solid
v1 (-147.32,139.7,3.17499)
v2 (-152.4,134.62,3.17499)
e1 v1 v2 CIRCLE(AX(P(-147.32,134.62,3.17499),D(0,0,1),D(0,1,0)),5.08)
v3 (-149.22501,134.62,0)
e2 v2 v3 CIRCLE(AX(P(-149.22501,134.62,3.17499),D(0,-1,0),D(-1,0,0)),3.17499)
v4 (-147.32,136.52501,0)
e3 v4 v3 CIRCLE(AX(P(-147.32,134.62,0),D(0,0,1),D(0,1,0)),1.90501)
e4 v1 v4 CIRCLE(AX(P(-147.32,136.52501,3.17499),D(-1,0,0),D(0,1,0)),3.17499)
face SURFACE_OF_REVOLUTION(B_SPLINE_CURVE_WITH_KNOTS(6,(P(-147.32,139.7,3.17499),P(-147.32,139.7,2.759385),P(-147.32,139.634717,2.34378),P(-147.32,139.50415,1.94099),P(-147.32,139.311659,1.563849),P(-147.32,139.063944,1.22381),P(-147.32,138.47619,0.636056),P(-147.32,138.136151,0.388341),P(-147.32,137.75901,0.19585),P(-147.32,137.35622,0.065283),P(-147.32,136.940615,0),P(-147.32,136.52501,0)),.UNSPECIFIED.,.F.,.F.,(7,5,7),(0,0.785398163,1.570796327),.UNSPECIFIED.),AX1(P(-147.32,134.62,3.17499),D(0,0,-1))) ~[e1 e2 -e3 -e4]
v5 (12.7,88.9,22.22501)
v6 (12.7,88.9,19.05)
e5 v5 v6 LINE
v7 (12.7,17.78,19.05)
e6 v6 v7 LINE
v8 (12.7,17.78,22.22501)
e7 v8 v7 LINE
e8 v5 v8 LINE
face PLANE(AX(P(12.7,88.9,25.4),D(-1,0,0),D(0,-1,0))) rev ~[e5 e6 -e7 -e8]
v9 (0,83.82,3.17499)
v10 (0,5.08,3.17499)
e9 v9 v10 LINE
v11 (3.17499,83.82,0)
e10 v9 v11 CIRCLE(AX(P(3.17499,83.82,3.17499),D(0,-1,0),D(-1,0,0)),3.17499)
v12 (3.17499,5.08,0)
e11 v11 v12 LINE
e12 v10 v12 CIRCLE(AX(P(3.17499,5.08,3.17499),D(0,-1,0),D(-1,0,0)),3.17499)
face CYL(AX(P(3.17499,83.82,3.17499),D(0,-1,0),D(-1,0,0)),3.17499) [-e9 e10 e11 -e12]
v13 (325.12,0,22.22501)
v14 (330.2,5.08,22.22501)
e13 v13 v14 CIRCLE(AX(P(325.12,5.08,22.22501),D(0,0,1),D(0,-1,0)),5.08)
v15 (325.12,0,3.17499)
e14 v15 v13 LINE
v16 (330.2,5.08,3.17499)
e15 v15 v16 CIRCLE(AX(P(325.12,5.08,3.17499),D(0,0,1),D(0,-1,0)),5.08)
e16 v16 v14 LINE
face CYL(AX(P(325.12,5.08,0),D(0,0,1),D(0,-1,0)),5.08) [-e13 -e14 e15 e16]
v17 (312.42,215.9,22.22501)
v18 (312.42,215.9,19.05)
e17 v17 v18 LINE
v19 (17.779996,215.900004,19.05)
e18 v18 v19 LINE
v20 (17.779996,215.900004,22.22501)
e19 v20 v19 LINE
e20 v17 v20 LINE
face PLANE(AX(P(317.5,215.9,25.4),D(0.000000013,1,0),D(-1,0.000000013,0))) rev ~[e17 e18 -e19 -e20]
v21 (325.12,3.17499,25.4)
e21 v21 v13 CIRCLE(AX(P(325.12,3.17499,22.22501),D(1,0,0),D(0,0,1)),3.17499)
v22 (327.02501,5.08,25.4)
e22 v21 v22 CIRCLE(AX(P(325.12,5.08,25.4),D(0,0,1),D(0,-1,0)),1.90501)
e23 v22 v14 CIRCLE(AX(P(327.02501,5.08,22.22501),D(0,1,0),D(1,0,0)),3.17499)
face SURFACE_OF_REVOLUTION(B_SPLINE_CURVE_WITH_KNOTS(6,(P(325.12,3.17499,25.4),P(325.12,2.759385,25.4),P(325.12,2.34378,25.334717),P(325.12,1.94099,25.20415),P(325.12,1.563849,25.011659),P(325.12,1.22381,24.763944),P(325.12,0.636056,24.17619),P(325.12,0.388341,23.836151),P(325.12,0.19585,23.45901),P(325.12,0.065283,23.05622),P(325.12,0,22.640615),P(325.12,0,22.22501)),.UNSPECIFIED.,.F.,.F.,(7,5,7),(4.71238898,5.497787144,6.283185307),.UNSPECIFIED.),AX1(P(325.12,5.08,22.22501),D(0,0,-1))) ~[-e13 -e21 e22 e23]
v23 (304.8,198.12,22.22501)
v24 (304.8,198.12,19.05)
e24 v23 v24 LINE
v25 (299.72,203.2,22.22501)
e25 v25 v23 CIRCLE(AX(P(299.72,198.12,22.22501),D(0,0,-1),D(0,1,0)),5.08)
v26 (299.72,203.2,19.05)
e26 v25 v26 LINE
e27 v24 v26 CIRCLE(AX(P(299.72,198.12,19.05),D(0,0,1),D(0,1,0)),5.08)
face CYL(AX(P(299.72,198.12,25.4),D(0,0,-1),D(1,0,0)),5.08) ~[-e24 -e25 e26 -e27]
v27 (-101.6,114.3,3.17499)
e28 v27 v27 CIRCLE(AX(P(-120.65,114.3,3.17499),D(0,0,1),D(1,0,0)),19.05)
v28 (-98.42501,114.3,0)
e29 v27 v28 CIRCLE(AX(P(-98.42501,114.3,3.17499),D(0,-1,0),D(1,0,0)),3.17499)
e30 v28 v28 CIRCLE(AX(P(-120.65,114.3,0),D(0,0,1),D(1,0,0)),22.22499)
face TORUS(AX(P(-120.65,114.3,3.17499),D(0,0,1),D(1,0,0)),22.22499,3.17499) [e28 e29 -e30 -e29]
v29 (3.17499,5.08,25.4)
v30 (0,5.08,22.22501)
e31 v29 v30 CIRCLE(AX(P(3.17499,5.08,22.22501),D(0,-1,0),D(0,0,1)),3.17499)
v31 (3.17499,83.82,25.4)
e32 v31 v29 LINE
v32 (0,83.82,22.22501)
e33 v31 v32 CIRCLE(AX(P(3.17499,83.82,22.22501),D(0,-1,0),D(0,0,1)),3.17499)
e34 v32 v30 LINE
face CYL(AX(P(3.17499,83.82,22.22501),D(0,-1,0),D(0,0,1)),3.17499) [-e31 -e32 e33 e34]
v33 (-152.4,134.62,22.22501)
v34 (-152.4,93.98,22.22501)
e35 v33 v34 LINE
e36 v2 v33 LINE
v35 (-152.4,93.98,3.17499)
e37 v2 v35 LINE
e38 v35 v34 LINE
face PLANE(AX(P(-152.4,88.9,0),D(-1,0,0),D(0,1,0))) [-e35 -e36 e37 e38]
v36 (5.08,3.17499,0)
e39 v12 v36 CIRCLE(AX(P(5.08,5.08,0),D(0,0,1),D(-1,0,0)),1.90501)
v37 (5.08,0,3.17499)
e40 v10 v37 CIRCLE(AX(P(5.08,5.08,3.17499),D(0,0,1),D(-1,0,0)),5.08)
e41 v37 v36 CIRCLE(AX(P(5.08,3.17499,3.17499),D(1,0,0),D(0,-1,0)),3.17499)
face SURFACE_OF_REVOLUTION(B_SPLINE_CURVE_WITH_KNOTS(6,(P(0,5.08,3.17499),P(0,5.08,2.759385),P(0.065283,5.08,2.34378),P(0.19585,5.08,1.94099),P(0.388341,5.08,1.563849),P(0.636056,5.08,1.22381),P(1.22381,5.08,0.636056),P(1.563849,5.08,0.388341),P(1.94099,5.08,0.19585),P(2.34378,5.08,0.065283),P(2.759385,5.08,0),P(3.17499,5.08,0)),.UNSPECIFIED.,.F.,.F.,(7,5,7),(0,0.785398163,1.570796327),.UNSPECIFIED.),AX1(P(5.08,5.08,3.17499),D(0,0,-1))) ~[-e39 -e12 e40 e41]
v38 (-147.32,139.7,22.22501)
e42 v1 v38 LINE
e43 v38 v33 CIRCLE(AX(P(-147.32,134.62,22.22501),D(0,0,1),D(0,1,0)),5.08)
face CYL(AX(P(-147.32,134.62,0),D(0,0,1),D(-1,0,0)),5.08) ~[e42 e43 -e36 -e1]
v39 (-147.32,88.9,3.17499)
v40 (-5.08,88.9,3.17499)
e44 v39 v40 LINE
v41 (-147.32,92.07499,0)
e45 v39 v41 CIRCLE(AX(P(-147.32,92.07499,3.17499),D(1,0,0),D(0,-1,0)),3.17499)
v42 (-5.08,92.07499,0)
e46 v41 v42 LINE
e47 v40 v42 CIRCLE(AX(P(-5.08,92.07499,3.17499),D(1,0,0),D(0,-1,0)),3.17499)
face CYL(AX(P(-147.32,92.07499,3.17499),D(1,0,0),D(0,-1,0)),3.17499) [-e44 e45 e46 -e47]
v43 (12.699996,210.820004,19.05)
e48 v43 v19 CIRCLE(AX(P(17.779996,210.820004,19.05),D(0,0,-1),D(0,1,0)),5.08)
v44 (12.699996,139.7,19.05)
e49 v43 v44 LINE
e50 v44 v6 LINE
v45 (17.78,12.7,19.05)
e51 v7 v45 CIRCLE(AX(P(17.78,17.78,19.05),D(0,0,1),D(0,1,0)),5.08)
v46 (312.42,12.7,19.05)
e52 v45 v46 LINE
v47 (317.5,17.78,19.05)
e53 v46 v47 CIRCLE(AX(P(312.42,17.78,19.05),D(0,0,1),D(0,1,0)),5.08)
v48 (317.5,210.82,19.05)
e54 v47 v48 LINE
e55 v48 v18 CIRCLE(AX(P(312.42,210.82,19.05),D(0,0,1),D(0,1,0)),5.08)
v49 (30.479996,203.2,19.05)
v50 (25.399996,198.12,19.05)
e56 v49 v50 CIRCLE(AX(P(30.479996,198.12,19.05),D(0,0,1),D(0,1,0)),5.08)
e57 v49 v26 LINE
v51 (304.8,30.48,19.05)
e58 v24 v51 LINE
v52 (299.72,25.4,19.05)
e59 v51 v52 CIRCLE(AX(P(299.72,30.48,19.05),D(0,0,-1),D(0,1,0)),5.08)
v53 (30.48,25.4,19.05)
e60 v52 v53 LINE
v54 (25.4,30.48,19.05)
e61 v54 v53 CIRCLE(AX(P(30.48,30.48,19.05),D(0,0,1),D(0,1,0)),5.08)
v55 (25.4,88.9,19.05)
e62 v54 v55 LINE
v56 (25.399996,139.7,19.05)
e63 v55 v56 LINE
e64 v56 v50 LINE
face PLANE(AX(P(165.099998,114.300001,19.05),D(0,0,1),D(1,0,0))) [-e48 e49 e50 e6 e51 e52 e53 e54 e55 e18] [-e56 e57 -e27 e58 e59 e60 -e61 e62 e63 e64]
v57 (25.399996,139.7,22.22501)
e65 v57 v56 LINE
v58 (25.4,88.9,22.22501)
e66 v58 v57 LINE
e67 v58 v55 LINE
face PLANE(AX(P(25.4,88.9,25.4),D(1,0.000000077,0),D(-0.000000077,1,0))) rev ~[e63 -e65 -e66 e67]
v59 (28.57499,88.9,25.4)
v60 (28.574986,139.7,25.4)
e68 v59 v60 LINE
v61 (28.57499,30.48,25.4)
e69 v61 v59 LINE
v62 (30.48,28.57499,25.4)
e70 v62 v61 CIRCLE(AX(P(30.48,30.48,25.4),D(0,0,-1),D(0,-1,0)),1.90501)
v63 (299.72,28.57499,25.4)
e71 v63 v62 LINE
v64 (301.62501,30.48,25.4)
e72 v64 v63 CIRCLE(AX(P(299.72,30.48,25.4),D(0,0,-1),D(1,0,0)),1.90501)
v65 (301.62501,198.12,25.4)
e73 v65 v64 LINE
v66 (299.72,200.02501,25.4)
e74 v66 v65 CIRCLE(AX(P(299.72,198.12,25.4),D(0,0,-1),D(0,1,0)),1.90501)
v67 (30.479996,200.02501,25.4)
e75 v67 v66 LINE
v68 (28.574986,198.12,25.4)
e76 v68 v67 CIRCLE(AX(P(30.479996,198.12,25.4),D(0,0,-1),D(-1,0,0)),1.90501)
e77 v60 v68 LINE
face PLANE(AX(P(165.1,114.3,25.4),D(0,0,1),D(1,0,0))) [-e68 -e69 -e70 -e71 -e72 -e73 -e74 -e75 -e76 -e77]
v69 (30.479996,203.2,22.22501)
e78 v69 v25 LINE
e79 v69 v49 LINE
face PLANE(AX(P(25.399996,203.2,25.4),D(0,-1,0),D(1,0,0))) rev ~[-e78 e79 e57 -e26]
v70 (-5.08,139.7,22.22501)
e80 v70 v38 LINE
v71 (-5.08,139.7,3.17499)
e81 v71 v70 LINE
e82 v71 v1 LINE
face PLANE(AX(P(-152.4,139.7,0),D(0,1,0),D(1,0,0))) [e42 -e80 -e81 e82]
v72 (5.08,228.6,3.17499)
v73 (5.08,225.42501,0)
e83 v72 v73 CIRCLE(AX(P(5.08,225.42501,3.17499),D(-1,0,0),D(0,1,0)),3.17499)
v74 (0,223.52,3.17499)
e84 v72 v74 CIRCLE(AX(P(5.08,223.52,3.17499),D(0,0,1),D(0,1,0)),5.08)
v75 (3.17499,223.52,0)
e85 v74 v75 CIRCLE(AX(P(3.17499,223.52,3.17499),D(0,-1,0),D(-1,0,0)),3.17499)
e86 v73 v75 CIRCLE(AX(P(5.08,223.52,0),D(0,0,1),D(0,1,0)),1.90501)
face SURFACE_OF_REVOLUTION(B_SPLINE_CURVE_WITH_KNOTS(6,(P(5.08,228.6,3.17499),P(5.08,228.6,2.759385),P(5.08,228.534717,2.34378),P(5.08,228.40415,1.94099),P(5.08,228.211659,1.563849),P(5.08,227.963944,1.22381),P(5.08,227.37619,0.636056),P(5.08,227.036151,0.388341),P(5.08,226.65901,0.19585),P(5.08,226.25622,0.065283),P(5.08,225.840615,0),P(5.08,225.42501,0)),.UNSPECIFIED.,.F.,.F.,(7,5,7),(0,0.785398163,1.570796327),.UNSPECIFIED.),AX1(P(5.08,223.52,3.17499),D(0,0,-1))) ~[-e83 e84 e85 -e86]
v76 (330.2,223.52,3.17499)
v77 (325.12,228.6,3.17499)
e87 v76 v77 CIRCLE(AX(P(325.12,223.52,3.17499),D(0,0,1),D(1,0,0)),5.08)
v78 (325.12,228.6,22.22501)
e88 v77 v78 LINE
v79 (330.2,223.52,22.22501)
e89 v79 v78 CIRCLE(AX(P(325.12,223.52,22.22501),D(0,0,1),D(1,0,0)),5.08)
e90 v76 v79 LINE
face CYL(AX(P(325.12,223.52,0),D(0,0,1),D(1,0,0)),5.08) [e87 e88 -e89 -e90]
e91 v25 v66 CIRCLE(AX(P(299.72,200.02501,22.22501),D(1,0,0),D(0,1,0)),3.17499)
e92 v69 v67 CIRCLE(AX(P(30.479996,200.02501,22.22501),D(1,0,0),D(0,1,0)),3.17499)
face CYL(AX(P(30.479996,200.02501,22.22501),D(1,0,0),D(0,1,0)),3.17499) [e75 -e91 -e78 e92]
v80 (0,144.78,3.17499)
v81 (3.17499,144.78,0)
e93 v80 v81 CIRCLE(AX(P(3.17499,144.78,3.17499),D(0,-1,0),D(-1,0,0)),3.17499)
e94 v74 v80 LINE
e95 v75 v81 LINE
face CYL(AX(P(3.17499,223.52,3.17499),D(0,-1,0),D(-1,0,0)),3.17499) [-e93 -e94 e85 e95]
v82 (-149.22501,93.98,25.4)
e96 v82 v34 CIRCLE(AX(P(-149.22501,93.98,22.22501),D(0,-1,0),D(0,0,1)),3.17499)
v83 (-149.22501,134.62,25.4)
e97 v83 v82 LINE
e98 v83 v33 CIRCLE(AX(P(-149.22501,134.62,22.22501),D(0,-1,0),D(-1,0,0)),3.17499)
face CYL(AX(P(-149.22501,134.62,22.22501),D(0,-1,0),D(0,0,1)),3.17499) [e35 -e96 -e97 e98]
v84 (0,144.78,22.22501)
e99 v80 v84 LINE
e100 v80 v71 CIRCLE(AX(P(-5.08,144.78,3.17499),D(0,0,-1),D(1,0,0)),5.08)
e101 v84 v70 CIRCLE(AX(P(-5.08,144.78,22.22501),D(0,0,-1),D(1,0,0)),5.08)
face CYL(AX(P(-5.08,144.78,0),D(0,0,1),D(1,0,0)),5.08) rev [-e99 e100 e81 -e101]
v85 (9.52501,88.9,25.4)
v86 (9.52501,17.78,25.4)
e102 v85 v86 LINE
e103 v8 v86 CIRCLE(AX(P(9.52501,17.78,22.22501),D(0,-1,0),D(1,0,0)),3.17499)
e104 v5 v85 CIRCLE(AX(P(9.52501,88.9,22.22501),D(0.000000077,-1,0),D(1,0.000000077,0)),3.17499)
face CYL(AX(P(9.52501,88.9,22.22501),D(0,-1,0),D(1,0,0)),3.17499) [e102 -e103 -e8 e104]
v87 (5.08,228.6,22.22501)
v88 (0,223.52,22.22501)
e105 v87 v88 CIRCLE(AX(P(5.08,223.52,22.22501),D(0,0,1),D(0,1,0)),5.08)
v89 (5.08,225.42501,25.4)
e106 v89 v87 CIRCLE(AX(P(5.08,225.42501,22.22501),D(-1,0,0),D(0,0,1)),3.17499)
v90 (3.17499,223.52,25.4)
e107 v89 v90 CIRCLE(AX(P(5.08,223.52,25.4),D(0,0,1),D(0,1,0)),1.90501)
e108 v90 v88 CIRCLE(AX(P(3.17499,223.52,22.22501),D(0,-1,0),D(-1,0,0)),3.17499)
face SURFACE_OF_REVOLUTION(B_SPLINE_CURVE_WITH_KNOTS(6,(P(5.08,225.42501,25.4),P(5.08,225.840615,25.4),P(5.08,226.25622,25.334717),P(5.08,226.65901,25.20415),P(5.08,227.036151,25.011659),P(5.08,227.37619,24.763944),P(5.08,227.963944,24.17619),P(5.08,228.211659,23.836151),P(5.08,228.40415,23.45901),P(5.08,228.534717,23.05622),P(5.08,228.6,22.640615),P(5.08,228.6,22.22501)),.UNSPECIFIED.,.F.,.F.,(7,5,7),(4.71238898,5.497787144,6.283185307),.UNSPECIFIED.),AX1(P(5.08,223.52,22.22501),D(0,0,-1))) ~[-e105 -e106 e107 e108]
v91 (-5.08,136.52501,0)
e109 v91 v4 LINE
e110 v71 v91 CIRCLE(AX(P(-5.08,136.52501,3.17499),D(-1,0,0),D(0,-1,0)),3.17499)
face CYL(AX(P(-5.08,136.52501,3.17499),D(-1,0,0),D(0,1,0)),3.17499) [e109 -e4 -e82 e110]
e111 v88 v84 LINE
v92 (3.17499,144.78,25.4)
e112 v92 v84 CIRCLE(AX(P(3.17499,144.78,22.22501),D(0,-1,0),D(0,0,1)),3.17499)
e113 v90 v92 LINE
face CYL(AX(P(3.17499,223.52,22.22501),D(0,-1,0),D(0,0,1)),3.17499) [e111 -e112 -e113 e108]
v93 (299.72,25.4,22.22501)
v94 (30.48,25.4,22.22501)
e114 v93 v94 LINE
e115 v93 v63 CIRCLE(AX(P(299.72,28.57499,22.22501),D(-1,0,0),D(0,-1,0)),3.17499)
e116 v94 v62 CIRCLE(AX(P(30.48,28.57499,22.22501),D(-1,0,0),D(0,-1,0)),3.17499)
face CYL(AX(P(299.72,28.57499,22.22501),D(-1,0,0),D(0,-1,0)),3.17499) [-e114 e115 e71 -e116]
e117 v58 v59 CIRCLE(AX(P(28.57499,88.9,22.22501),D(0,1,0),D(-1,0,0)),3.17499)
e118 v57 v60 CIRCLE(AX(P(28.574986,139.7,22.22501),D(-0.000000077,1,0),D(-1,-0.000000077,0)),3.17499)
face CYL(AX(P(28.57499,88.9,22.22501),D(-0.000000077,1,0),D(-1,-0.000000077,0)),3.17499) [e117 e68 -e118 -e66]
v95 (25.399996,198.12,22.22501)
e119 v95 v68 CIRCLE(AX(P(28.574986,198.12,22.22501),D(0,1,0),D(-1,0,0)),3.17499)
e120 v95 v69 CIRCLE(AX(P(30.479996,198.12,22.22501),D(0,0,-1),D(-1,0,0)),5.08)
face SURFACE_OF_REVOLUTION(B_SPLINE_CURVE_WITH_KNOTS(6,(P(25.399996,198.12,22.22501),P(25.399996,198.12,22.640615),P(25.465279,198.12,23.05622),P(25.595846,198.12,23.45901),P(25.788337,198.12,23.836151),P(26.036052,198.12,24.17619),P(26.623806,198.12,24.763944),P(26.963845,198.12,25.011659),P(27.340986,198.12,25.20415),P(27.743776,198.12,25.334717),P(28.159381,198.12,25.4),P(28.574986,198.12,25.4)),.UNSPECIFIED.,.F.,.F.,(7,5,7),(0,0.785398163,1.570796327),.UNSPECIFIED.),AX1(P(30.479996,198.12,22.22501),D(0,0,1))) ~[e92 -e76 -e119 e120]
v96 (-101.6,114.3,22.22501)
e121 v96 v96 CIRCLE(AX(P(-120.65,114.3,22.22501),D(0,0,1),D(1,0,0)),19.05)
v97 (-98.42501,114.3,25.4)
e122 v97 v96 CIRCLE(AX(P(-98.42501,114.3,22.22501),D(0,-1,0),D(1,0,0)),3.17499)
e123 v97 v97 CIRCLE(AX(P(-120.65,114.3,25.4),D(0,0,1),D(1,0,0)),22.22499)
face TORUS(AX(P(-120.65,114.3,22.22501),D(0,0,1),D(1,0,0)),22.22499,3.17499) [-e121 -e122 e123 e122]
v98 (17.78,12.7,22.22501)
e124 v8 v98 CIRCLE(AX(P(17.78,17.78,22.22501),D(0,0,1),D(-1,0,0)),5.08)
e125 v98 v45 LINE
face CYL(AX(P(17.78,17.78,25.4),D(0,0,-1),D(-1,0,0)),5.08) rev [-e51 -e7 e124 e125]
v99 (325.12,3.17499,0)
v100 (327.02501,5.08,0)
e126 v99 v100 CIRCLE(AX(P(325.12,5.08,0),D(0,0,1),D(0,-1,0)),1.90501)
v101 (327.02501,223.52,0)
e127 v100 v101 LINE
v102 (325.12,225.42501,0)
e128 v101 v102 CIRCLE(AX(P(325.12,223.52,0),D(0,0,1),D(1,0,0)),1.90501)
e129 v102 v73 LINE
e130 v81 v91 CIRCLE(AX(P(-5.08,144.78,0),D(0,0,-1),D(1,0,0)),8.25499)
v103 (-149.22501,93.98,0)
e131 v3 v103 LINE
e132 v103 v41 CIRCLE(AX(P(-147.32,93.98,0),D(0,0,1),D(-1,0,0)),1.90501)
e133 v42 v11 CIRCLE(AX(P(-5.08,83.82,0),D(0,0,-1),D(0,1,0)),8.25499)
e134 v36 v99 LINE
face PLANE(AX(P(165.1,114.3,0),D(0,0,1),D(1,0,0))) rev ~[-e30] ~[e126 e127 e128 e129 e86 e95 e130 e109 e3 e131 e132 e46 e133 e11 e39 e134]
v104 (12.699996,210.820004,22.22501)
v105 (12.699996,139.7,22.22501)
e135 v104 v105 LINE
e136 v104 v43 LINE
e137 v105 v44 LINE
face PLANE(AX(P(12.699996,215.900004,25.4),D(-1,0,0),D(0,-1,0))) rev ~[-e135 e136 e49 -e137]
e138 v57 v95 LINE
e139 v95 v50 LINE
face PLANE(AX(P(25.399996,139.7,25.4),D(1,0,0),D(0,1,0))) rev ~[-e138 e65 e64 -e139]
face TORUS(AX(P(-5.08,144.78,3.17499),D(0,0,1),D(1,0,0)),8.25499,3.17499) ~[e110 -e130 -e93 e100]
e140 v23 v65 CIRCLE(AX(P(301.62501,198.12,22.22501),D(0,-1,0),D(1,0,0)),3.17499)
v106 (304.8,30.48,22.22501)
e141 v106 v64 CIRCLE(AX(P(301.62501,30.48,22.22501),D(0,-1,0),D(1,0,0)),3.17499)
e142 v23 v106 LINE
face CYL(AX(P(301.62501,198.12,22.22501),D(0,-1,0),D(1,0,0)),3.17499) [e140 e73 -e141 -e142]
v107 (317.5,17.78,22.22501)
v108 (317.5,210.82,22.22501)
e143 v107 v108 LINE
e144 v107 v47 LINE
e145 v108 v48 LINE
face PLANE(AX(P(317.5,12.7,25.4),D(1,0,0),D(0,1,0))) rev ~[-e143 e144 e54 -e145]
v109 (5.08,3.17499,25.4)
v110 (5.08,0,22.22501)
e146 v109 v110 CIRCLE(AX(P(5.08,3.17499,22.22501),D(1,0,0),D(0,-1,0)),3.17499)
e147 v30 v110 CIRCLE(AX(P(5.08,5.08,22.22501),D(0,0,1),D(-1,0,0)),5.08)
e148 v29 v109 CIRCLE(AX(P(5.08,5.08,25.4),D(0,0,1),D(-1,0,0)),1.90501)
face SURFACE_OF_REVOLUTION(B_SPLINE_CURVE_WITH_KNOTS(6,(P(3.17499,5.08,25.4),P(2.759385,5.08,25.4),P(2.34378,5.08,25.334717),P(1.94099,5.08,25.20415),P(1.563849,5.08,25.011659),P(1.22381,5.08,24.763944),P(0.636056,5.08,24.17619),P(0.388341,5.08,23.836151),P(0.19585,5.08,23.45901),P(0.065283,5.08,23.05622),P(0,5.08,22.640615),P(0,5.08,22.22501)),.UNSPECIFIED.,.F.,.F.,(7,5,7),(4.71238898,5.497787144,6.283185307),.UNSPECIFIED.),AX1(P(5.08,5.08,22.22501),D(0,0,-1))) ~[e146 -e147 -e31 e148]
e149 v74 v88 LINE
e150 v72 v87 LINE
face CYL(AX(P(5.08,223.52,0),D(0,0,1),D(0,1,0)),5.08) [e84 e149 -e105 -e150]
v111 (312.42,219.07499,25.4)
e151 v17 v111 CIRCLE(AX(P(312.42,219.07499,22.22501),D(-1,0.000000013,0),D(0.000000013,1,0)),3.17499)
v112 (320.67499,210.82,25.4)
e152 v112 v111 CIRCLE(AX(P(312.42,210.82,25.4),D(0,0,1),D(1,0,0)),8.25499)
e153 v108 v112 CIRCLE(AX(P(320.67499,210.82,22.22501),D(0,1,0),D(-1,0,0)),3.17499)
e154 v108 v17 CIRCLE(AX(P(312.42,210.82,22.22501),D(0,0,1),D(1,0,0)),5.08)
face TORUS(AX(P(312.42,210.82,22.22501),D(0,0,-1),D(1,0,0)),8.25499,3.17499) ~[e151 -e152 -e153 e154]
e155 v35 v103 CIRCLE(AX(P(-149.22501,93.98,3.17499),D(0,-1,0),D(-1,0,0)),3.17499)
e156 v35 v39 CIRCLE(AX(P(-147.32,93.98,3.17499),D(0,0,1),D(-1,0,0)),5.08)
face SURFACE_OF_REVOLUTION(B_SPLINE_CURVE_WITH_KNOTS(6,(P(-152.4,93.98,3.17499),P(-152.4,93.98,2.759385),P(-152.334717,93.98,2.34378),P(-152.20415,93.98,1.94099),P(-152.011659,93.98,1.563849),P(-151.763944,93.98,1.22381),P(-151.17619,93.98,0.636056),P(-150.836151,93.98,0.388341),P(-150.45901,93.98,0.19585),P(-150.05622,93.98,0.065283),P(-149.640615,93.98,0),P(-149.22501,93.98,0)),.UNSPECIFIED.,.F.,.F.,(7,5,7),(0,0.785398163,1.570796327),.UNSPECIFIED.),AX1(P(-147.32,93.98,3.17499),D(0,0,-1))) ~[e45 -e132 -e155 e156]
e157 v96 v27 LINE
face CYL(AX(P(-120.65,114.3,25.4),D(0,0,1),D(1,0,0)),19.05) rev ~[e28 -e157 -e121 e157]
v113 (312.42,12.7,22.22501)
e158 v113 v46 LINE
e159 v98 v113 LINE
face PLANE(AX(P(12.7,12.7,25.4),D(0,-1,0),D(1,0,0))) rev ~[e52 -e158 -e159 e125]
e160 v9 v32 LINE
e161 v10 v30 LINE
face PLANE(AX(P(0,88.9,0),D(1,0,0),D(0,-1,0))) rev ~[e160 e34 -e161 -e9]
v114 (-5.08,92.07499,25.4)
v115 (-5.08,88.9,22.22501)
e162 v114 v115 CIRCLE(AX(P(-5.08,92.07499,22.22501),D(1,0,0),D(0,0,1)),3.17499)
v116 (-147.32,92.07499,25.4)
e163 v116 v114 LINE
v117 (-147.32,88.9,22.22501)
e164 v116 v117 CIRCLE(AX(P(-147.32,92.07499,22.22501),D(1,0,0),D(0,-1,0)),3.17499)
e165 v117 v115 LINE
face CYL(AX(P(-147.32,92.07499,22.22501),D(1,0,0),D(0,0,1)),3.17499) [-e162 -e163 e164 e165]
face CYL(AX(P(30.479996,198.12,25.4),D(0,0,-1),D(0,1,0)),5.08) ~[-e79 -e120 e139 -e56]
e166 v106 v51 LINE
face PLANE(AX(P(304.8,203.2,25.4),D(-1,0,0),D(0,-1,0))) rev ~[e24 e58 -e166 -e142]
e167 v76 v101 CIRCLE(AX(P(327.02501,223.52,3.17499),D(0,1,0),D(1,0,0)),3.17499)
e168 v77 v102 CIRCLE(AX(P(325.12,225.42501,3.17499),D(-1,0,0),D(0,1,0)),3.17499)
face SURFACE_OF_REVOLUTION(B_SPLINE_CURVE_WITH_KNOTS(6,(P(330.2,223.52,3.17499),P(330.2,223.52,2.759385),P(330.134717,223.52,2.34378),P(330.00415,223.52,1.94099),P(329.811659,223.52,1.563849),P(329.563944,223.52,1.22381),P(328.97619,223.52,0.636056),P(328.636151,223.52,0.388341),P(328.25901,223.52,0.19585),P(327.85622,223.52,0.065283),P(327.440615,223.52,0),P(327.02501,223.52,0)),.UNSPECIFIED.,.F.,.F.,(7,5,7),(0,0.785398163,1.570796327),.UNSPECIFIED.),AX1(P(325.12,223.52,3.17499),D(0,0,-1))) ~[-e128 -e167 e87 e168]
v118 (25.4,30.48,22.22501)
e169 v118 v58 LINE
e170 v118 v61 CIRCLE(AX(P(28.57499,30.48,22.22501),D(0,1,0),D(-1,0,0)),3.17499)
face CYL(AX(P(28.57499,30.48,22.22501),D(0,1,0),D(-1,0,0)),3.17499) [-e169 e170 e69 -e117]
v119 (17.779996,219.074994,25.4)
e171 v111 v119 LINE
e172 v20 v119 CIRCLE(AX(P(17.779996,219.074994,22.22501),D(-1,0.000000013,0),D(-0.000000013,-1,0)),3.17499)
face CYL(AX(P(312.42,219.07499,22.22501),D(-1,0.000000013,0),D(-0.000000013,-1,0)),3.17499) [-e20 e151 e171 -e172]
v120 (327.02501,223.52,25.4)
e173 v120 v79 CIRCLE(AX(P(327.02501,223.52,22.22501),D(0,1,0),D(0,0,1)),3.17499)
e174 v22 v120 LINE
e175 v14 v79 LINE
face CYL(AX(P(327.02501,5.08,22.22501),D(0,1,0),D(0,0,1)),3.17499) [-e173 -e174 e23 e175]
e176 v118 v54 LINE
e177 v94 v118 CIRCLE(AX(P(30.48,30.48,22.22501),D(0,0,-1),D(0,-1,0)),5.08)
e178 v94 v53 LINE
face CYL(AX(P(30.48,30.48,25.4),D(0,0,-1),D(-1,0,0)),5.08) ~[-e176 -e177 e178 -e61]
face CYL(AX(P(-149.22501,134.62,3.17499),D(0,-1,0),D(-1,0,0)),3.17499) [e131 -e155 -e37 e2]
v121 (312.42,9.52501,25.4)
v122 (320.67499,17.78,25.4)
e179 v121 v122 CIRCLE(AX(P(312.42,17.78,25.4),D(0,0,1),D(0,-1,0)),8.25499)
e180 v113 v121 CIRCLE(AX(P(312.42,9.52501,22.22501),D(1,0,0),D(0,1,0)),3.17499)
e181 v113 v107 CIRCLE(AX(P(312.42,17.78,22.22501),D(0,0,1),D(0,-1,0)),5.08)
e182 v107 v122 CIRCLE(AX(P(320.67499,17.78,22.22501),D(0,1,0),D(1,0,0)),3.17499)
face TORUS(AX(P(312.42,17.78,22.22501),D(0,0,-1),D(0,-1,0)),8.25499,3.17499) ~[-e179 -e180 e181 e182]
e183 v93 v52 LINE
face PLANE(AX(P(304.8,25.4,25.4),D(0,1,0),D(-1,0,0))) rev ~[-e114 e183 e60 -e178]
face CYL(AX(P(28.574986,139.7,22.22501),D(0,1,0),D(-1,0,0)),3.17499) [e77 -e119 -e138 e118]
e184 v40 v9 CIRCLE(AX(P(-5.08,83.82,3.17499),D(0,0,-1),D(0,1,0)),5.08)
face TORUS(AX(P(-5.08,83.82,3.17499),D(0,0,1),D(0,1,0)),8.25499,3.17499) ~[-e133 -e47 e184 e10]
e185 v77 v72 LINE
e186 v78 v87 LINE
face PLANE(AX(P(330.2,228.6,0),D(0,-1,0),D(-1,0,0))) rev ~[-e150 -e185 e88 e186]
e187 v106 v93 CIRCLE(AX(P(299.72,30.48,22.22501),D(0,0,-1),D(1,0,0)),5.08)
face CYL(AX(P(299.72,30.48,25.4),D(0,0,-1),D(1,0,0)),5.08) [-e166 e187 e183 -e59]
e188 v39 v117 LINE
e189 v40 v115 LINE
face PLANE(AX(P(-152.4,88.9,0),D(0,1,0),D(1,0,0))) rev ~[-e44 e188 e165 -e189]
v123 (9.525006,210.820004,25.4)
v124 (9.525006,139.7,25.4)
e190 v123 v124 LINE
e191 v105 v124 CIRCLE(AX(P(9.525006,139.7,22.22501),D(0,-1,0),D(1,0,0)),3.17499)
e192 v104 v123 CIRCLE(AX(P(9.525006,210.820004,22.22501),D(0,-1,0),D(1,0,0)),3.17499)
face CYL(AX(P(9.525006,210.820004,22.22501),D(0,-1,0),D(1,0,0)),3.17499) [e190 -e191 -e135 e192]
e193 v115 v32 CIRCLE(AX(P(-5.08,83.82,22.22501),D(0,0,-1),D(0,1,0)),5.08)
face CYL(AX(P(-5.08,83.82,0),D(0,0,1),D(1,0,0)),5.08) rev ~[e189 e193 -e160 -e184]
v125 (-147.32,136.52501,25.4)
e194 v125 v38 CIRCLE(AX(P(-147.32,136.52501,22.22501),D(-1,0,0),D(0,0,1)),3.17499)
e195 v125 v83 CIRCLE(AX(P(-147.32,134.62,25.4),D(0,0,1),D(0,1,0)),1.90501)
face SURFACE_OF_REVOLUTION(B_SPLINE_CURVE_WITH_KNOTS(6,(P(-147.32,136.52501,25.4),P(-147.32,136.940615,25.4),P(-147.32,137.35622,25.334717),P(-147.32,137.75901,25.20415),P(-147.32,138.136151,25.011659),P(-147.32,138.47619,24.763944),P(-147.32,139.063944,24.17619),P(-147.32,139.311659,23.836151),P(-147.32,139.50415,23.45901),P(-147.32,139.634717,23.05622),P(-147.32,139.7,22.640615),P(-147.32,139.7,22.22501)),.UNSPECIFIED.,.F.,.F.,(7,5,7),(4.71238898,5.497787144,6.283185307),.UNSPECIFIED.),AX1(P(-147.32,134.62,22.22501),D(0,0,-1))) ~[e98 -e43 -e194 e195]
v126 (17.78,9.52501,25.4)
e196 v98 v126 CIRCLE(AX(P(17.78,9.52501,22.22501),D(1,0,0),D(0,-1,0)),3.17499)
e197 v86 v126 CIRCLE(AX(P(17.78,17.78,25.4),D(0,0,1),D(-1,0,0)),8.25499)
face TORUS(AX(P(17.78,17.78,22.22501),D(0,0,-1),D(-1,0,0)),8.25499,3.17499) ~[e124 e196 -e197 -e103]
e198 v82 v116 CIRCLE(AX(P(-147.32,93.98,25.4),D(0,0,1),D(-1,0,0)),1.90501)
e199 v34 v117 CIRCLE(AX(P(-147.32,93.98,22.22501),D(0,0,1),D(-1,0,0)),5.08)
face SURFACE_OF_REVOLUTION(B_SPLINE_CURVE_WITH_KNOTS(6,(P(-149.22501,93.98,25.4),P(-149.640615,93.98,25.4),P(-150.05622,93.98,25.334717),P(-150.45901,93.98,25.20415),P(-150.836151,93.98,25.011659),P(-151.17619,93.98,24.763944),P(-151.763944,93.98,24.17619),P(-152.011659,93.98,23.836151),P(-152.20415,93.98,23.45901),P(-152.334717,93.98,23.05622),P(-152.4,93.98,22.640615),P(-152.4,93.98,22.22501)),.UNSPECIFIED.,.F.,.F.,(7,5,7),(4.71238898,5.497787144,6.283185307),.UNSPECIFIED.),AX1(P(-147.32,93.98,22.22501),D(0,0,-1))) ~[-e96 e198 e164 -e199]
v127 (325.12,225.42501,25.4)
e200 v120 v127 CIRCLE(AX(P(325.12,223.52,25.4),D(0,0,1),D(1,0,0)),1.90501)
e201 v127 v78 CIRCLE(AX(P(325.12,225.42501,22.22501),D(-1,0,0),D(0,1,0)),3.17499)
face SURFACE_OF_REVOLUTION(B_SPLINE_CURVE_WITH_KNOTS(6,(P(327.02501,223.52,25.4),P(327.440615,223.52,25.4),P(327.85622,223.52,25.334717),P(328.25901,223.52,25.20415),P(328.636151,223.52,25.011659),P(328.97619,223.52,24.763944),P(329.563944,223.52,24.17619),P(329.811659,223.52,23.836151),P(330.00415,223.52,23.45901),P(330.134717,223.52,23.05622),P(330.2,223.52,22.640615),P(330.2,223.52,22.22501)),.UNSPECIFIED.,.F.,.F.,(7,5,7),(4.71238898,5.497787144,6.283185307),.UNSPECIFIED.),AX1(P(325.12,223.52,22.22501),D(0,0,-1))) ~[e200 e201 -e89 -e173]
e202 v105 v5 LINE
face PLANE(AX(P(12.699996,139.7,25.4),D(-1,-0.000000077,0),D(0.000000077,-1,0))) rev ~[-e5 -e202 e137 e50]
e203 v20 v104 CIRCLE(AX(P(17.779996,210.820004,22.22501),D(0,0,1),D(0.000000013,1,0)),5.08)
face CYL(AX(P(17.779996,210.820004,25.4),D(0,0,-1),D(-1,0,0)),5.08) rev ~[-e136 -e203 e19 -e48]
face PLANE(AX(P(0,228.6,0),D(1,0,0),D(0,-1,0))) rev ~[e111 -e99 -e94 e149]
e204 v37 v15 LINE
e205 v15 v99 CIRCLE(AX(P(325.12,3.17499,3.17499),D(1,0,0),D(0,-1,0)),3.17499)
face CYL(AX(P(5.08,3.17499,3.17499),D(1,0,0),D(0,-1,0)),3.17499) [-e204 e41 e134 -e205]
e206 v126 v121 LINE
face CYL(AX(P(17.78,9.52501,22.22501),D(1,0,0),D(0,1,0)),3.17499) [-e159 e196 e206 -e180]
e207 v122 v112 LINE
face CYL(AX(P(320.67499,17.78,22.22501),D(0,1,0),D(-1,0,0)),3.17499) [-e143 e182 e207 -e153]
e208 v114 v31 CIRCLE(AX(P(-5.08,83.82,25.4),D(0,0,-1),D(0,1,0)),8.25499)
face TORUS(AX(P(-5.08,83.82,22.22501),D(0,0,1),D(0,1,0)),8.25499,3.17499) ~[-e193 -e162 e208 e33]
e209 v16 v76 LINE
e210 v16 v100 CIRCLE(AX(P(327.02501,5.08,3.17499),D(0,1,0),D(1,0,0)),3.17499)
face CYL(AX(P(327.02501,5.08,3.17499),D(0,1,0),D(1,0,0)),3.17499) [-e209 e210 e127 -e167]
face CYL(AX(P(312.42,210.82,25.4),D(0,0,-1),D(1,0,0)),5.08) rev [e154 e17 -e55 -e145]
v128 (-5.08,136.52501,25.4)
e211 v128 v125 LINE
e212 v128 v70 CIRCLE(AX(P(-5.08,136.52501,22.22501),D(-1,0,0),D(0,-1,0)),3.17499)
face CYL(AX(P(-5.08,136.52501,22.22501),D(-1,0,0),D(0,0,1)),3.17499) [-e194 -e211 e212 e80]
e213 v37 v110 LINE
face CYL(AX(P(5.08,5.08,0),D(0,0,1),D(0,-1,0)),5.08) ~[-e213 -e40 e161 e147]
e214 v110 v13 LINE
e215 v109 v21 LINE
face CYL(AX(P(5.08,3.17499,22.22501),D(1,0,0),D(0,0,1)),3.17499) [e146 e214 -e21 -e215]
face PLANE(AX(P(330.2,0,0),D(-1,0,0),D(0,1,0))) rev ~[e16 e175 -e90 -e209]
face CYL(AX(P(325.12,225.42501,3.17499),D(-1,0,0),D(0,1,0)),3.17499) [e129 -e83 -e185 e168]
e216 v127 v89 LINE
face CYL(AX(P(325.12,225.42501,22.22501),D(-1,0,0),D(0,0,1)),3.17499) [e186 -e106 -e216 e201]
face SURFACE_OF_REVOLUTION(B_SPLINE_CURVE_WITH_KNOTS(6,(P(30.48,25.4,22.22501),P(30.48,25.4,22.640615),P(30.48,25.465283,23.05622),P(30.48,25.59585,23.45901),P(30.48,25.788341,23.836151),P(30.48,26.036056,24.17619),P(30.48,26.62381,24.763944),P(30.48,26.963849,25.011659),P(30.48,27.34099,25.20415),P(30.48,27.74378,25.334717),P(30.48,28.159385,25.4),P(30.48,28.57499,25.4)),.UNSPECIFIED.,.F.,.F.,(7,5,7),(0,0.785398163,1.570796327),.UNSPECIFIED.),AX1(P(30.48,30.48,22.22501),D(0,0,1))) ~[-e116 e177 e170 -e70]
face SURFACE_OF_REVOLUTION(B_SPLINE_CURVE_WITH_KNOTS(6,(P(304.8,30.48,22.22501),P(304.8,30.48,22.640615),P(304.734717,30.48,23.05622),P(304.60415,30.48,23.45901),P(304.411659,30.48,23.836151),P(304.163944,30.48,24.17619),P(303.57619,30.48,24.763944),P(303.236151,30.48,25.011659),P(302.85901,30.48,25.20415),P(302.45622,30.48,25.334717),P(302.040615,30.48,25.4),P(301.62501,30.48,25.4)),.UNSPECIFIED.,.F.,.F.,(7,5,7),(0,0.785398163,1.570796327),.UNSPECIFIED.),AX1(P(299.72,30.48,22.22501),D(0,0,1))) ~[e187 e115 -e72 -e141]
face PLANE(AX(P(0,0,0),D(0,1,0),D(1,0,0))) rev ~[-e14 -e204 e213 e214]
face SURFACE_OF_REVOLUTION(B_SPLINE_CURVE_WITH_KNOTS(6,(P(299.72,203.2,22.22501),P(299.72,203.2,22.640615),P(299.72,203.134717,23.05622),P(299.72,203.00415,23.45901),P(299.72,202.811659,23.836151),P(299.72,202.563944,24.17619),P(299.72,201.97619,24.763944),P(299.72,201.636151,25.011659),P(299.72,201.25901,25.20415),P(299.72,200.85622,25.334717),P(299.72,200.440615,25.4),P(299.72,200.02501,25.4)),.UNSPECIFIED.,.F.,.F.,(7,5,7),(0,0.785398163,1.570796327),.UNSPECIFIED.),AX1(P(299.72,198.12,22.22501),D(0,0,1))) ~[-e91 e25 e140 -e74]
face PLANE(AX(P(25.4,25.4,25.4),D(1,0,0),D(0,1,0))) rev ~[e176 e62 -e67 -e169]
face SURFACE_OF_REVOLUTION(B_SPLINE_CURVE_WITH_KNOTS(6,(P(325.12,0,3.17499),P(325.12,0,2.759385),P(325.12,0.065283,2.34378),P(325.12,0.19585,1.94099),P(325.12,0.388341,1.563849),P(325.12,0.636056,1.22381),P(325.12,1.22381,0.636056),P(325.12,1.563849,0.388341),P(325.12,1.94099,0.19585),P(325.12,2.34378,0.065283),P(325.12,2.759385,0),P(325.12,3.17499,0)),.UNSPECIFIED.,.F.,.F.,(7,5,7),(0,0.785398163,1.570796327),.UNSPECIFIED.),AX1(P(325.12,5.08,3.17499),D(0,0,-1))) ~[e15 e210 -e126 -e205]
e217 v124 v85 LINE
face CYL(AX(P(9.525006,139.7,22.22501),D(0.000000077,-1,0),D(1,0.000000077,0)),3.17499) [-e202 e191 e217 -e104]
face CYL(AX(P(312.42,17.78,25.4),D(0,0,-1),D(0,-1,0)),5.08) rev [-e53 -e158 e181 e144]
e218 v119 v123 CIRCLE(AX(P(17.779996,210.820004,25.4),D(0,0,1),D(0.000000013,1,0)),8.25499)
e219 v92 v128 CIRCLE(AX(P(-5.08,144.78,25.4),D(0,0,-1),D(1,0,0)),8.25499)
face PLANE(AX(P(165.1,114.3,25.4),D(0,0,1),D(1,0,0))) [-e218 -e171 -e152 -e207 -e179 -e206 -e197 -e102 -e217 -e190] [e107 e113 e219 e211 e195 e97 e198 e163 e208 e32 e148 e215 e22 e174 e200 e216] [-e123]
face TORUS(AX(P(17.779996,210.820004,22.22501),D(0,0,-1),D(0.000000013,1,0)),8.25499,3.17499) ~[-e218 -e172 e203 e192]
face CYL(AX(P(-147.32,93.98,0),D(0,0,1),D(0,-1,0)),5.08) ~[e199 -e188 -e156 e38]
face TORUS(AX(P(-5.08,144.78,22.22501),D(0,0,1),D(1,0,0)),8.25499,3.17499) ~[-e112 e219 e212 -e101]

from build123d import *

# Parameters (mm, degrees)
F0_W     = 152.4
F0_H     = 50.8
F1_DEPTH = 25.4
F2_R     = 19.05
F3_DEPTH = 25.4
F5_DEPTH = 6.35
F6_R     = 5.08
F7_R     = 5.08
F8_R     = 5.08
F9_R     = 3.17499


# Not quite as in the source:
# - a fillet or chamfer is up to 0.001 mm smaller than in the source, because OpenCascade refuses the exact size
# - ends of sketch curves that miss each other by under 0.0002 mm in the source are joined


with BuildPart() as f1:
    # F0 (on Top) → F1 (new body)
    with BuildSketch(Plane.XY):
        Polygon((0, 88.9), (0, 0), (330.2, 0), (330.2, 228.6), (0, 228.6), (0, 139.7), align=None)
        with Locations((-76.2, 114.3)):
            Rectangle(F0_W, F0_H)
    extrude(amount=F1_DEPTH)

    # F2 (on face) → F3 (cut)
    with BuildSketch(Plane.XY.offset(25.4)):
        with Locations((-120.65, 114.3)):
            Circle(F2_R)
    extrude(amount=-F3_DEPTH, mode=Mode.SUBTRACT)

    # F4 (on face) → F5 (cut)
    with BuildSketch(Plane.XY.offset(25.4)):
        Polygon((12.6999960899, 215.9000039101), (12.6999960899, 139.7), (12.7, 88.9), (12.7, 12.7), (317.5, 12.7), (317.5, 215.9), align=None)
        Polygon((304.8, 25.4), (25.4, 25.4), (25.4, 88.9), (25.3999960899, 139.7), (25.3999960899, 203.2), (304.8, 203.2), align=None, mode=Mode.SUBTRACT)
    extrude(amount=-F5_DEPTH, mode=Mode.SUBTRACT)

    # F6
    f6_edges = [f1.edges().sort_by_distance(p)[0] for p in [
        (12.7, 12.7, 22.225),
        (12.699996, 215.900004, 22.225),
        (317.5, 12.7, 22.225),
        (317.5, 215.9, 22.225),
    ]]
    fillet(f6_edges, radius=F6_R)

    # F7
    f7_edges = [f1.edges().sort_by_distance(p)[0] for p in [
        (0, 228.6, 12.7),
        (0, 0, 12.7),
        (-152.4, 88.9, 12.7),
        (-152.4, 139.7, 12.7),
        (0, 139.7, 12.7),
        (0, 88.9, 12.7),
        (330.2, 0, 12.7),
        (330.2, 228.6, 12.7),
    ]]
    fillet(f7_edges, radius=F7_R)

    # F8
    f8_edges = [f1.edges().sort_by_distance(p)[0] for p in [
        (25.399996, 203.2, 22.225),
        (25.4, 25.4, 22.225),
        (304.8, 25.4, 22.225),
        (304.8, 203.2, 22.225),
    ]]
    fillet(f8_edges, radius=F8_R)

    # F9 (radius 3.175 in the source; OpenCascade refuses exactly that, so slightly less here)
    f9_edges = [f1.edges().sort_by_distance(p)[0] for p in [
        (0, 44.45, 25.4),
        (-1.487898, 87.412102, 25.4),
        (1.487898, 1.487898, 25.4),
        (-76.2, 88.9, 25.4),
        (165.1, 0, 25.4),
        (-150.912102, 90.387898, 25.4),
        (328.712102, 1.487898, 25.4),
        (-152.4, 114.3, 25.4),
        (330.2, 114.3, 25.4),
        (-150.912102, 138.212102, 25.4),
        (328.712102, 227.112102, 25.4),
        (-76.2, 139.7, 25.4),
        (165.1, 228.6, 25.4),
        (-1.487898, 141.187898, 25.4),
        (1.487898, 227.112102, 25.4),
        (0, 184.15, 25.4),
        (12.699996, 175.260002, 25.4),
        (14.187894, 214.412106, 25.4),
        (12.699998, 114.3, 25.4),
        (165.099998, 215.900002, 25.4),
        (12.7, 53.34, 25.4),
        (316.012102, 214.412102, 25.4),
        (14.187898, 14.187898, 25.4),
        (317.5, 114.3, 25.4),
        (165.1, 12.7, 25.4),
        (316.012102, 14.187898, 25.4),
        (-139.7, 114.3, 25.4),
        (165.1, 25.4, 25.4),
        (303.312102, 26.887898, 25.4),
        (26.887898, 26.887898, 25.4),
        (304.8, 114.3, 25.4),
        (25.4, 59.69, 25.4),
        (303.312102, 201.712102, 25.4),
        (25.399998, 114.3, 25.4),
        (165.099998, 203.2, 25.4),
        (25.399996, 168.91, 25.4),
        (26.887894, 201.712102, 25.4),
        (0, 44.45, 0),
        (-1.487898, 87.412102, 0),
        (1.487898, 1.487898, 0),
        (-76.2, 88.9, 0),
        (165.1, 0, 0),
        (-150.912102, 90.387898, 0),
        (328.712102, 1.487898, 0),
        (-152.4, 114.3, 0),
        (330.2, 114.3, 0),
        (-150.912102, 138.212102, 0),
        (328.712102, 227.112102, 0),
        (-76.2, 139.7, 0),
        (165.1, 228.6, 0),
        (-1.487898, 141.187898, 0),
        (1.487898, 227.112102, 0),
        (0, 184.15, 0),
        (-139.7, 114.3, 0),
    ]]
    fillet(f9_edges, radius=F9_R)


solid = f1.part
